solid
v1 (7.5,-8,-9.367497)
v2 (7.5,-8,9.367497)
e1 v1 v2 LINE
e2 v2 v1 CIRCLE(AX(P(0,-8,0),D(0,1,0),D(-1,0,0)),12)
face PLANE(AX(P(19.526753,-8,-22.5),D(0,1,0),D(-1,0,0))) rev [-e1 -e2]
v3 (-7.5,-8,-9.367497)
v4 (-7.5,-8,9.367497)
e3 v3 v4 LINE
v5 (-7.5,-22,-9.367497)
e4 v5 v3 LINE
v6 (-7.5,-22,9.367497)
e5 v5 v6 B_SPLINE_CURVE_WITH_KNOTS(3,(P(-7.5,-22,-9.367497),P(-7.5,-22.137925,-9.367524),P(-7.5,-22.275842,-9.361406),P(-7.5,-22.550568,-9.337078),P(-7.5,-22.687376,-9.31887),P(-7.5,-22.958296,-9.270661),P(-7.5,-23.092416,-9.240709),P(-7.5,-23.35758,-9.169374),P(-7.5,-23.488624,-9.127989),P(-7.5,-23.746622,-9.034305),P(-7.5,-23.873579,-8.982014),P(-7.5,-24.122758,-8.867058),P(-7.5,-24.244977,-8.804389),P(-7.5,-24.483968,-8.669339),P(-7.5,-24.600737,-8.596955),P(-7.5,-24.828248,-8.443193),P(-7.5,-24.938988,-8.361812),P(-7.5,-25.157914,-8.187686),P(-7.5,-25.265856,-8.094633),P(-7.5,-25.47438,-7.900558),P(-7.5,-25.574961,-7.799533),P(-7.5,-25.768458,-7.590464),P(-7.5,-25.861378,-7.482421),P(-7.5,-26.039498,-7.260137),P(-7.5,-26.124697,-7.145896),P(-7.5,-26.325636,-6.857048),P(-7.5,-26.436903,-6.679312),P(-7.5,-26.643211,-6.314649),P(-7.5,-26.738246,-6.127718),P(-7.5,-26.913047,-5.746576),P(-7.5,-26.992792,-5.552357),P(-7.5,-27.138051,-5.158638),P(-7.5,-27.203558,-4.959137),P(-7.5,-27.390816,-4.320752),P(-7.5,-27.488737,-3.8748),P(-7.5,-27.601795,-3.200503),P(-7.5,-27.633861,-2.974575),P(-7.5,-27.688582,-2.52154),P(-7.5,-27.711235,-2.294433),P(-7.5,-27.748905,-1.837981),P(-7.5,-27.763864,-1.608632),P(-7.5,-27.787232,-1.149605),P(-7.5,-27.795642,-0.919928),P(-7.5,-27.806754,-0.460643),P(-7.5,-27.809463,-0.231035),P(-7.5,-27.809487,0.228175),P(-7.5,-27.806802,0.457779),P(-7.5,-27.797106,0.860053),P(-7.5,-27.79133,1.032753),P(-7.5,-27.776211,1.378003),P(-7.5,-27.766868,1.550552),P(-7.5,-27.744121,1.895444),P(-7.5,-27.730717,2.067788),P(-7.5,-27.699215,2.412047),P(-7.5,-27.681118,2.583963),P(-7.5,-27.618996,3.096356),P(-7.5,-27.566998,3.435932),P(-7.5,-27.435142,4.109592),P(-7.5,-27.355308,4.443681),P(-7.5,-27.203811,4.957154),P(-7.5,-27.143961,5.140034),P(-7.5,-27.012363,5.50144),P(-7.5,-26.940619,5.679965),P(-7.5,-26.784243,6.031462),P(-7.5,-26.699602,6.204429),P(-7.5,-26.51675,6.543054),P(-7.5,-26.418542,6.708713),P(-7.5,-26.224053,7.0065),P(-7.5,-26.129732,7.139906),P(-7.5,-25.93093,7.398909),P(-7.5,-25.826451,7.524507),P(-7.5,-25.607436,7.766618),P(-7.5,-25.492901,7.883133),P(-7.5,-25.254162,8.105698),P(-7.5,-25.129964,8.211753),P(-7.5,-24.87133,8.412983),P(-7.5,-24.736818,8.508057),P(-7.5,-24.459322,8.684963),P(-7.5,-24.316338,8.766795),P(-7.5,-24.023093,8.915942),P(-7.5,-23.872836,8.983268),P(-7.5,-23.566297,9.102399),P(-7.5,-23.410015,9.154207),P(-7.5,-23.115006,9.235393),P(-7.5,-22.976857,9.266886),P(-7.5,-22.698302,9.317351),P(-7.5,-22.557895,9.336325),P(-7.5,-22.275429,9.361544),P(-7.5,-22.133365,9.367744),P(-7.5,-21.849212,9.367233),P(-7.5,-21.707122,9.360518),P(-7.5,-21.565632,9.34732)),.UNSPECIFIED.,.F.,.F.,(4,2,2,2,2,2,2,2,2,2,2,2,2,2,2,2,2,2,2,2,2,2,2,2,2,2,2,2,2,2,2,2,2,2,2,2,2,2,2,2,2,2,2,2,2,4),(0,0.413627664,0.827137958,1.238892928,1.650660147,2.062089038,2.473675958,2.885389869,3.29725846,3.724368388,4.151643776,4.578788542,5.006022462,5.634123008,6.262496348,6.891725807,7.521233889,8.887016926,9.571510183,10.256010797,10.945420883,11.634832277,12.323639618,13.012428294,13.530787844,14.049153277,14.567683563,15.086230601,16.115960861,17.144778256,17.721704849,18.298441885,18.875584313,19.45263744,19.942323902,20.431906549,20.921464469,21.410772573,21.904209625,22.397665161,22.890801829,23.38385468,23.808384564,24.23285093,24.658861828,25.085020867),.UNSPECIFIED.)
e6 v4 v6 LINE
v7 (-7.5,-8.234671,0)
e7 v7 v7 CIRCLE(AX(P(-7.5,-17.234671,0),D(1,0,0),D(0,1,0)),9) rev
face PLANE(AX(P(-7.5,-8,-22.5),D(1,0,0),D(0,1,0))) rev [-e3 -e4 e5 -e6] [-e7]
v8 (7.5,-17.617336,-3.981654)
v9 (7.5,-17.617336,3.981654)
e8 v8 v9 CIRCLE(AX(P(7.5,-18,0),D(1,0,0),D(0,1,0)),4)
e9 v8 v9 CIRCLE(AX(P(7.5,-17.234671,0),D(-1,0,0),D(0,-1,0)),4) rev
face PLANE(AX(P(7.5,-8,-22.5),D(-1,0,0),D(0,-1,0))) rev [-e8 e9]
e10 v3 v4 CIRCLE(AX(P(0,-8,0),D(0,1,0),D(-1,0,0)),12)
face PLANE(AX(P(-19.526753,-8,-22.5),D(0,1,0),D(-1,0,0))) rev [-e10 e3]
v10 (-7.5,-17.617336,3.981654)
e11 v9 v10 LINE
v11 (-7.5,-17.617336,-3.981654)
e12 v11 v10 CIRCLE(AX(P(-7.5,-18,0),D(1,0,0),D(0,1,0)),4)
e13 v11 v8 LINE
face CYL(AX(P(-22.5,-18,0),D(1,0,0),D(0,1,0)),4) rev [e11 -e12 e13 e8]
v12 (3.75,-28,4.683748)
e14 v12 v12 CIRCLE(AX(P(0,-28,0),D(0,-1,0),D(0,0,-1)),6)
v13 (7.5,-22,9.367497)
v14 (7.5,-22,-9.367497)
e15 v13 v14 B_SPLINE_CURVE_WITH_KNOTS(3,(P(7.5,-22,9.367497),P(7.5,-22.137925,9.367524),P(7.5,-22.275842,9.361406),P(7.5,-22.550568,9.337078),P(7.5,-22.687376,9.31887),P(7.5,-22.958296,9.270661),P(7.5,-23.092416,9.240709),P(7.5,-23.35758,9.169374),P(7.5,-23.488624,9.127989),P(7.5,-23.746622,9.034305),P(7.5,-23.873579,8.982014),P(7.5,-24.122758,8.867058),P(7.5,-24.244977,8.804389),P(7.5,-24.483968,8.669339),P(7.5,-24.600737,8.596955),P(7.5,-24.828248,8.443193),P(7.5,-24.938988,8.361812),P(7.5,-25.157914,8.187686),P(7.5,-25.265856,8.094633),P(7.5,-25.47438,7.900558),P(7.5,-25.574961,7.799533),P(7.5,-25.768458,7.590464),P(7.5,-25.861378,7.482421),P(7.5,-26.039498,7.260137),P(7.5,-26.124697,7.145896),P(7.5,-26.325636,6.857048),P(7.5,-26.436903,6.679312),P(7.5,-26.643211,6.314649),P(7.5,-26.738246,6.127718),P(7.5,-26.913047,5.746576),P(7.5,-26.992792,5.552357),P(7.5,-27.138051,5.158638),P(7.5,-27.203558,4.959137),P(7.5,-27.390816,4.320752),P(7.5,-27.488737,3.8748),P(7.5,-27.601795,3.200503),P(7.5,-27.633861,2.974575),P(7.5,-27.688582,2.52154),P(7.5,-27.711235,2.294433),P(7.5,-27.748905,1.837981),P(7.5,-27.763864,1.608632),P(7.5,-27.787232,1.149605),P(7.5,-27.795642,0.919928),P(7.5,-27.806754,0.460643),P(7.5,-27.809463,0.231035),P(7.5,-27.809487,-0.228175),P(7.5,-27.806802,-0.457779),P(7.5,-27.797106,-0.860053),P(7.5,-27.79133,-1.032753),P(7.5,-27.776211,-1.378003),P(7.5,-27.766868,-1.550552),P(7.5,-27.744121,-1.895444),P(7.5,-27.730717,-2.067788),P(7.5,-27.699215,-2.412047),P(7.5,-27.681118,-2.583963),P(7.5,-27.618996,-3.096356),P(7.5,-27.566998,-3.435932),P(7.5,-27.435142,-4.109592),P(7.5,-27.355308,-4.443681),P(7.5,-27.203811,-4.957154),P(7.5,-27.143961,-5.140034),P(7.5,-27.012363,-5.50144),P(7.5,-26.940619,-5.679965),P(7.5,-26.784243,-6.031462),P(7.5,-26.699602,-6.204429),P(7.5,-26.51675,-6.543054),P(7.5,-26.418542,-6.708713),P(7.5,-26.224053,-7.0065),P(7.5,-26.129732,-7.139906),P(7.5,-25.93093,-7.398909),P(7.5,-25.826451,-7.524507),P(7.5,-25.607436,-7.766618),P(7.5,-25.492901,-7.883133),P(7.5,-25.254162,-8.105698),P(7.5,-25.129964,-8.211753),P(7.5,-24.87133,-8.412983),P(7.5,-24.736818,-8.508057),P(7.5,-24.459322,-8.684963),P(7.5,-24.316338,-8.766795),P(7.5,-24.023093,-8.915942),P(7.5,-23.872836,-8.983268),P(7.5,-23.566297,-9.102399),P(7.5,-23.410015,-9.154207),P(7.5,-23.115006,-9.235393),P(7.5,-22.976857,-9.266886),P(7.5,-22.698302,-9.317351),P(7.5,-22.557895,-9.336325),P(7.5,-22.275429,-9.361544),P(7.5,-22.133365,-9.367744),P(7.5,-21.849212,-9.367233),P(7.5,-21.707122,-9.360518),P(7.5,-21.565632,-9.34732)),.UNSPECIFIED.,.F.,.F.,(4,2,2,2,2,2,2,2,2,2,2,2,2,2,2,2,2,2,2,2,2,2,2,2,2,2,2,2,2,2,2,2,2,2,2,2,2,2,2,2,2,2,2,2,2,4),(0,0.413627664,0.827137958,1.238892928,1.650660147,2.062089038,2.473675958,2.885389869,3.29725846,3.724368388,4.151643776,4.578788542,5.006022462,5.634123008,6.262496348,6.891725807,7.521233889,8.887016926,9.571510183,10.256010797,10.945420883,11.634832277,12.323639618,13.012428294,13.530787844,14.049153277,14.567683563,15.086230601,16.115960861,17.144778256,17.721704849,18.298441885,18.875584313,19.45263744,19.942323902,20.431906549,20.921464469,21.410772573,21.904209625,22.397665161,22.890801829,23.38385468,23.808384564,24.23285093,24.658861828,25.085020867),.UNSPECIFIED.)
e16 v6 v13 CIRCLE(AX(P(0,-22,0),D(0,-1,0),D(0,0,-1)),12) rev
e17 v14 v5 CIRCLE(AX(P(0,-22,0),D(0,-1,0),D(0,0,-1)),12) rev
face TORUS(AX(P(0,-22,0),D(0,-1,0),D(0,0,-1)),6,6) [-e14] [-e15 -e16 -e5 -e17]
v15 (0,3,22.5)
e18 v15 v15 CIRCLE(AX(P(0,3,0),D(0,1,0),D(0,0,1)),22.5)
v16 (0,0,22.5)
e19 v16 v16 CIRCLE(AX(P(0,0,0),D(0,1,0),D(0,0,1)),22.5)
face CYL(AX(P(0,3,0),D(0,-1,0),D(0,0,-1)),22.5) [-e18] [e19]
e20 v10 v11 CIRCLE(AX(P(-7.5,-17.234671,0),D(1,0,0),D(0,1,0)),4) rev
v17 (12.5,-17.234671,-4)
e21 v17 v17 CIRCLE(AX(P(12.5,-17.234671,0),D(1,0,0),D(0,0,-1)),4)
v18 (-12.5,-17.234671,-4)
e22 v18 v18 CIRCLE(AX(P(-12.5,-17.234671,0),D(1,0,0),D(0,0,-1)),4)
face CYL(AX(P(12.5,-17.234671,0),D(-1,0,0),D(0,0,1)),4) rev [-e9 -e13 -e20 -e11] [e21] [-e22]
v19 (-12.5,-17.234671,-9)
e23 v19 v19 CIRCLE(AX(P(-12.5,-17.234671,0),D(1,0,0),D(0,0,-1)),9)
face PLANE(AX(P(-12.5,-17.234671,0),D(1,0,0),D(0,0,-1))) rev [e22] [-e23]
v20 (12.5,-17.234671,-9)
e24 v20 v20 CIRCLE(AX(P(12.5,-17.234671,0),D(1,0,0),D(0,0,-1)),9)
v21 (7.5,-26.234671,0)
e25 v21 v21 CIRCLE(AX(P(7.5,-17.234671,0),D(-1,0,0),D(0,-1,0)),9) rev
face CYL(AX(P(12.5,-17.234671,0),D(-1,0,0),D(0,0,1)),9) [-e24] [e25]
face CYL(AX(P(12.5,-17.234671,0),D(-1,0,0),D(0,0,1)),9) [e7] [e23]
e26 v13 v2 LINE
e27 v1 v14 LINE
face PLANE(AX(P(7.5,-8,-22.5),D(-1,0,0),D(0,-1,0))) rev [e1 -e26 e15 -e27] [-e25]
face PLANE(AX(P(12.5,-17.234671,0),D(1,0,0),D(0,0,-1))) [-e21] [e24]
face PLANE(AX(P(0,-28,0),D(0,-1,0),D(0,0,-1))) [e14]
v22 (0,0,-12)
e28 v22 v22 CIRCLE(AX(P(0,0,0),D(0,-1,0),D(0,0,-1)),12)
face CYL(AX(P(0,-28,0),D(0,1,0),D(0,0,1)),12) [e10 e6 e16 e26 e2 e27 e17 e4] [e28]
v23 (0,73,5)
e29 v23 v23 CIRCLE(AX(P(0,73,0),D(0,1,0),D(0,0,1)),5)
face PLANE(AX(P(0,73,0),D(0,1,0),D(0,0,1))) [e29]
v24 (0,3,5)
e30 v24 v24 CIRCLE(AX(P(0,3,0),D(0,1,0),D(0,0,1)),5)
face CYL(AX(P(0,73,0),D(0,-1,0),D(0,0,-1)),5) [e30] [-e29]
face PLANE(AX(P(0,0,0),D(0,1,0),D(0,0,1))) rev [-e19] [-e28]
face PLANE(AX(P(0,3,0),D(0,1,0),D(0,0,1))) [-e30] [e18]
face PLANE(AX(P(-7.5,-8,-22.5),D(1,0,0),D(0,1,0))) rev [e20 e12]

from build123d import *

# Parameters (mm, degrees)
SKETCH1_R               = 22.5
BOSS_EXTRUDE1_DEPTH     = 3
SKETCH2_R               = 5
BOSS_EXTRUDE2_DEPTH     = 70
SKETCH3_R               = 12
BOSS_EXTRUDE3_DEPTH     = 28
CUT_EXTRUDE1_DEPTH      = 80.633535649
CUT_EXTRUDE1_DEPTH_BACK = 80.633535649
SKETCH4_W               = 12.026752758
SKETCH4_H               = 20
FILLET1_R               = 6
CUT_EXTRUDE3_DEPTH      = 83.068568892
CUT_EXTRUDE3_DEPTH_BACK = 83.068568892
SKETCH6_R               = 4
SKETCH9_R               = 9
SKETCH9_R_2             = 4
BOSS_EXTRUDE4_DEPTH     = 12.5


with BuildPart() as part:
    # Sketch1 → Boss-Extrude1 (new body)
    with BuildSketch(Plane(origin=(0, 0, 0), x_dir=(1, 0, 0), z_dir=(0, 1, 0))):
        with Locations(Location((0, 0, 0), (0, 0, 270))):
            Circle(SKETCH1_R)
    extrude(amount=BOSS_EXTRUDE1_DEPTH)

    # Sketch2 → Boss-Extrude2 (add)
    with BuildSketch(Plane(origin=(0, 3, 0), x_dir=(1, 0, 0), z_dir=(0, 1, 0))):
        with Locations(Location((0, 0, 0), (0, 0, 270))):
            Circle(SKETCH2_R)
    extrude(amount=BOSS_EXTRUDE2_DEPTH)

    # Sketch3 → Boss-Extrude3 (add)
    with BuildSketch(Plane.XZ):
        with Locations(Location((0, 0, 0), (0, 0, 270))):
            Circle(SKETCH3_R)
    extrude(amount=BOSS_EXTRUDE3_DEPTH)

    # Sketch4 → Cut-Extrude1 (cut, two sides: drawn at the far end of the back side and taken through both)
    with BuildSketch(Plane.XY.offset(-CUT_EXTRUDE1_DEPTH_BACK)):
        with Locations((13.513376379, -18)):
            Rectangle(SKETCH4_W, SKETCH4_H)
        with Locations((-13.513376379, -18)):
            Rectangle(SKETCH4_W, SKETCH4_H)
    extrude(amount=CUT_EXTRUDE1_DEPTH + CUT_EXTRUDE1_DEPTH_BACK, mode=Mode.SUBTRACT)

    # Fillet1
    # the kernel refuses this fillet: 6 mm, written as the material it takes off along each edge
    with BuildSketch(Plane(origin=(0, -28, 0), x_dir=(0.9377485647369962, 0, -0.3473148849872455), z_dir=(-0.3473148849872455, 0, -0.9377485647369962))) as fillet1_piece_1:
        with BuildLine():
            CenterArc((12 - FILLET1_R, -FILLET1_R), FILLET1_R, 0, 90)
            Line((12 - FILLET1_R, 0), (12, 0))
            Line((12, 0), (12, -FILLET1_R))
        make_face()
    revolve(axis=Axis((0, -28, 0), (0, -1, 0)), revolution_arc=220.646338322, mode=Mode.SUBTRACT)
    with BuildSketch(Plane(origin=(0, -28, 0), x_dir=(0, 0, -1), z_dir=(-1, 0, 0))) as fillet1_piece_2:
        with BuildLine():
            CenterArc((12 - FILLET1_R, -FILLET1_R), FILLET1_R, 0, 90)
            Line((12 - FILLET1_R, 0), (12, 0))
            Line((12, 0), (12, -FILLET1_R))
        make_face()
    revolve(axis=Axis((0, -28, 0), (0, -1, 0)), revolution_arc=110.307225346, mode=Mode.SUBTRACT)
    with BuildSketch(Plane(origin=(0, -28, 0), x_dir=(-0.9378451764605575, 0, 0.34705392230842963), z_dir=(0.34705392230842963, 0, 0.9378451764605575))) as fillet1_piece_3:
        with BuildLine():
            CenterArc((12 - FILLET1_R, -FILLET1_R), FILLET1_R, 0, 90)
            Line((12 - FILLET1_R, 0), (12, 0))
            Line((12, 0), (12, -FILLET1_R))
        make_face()
    revolve(axis=Axis((0, -28, 0), (0, -1, 0)), revolution_arc=110.307225346, mode=Mode.SUBTRACT)

    # Sketch6 → Cut-Extrude3 (cut, two sides: drawn at the far end of the back side and taken through both)
    with BuildSketch(Plane(origin=(7.5, 0, 0), x_dir=(0, 0, -1), z_dir=(1, 0, 0)).offset(-CUT_EXTRUDE3_DEPTH_BACK)):
        with Locations(Location((0, -18, 0), (0, 0, 90))):
            Circle(SKETCH6_R)
    extrude(amount=CUT_EXTRUDE3_DEPTH + CUT_EXTRUDE3_DEPTH_BACK, mode=Mode.SUBTRACT)

    # Sketch9 → Boss-Extrude4 (add, symmetric)
    with BuildSketch(Plane(origin=(0, 0, 0), x_dir=(0, 0, -1), z_dir=(1, 0, 0))):
        with Locations(Location((0, -17.234671311, 0), (0, 0, 90))):
            Circle(SKETCH9_R)
        with Locations((0, -17.234671311)):
            Circle(SKETCH9_R_2, mode=Mode.SUBTRACT)
    extrude(amount=BOSS_EXTRUDE4_DEPTH, both=True)


solid = part.part
